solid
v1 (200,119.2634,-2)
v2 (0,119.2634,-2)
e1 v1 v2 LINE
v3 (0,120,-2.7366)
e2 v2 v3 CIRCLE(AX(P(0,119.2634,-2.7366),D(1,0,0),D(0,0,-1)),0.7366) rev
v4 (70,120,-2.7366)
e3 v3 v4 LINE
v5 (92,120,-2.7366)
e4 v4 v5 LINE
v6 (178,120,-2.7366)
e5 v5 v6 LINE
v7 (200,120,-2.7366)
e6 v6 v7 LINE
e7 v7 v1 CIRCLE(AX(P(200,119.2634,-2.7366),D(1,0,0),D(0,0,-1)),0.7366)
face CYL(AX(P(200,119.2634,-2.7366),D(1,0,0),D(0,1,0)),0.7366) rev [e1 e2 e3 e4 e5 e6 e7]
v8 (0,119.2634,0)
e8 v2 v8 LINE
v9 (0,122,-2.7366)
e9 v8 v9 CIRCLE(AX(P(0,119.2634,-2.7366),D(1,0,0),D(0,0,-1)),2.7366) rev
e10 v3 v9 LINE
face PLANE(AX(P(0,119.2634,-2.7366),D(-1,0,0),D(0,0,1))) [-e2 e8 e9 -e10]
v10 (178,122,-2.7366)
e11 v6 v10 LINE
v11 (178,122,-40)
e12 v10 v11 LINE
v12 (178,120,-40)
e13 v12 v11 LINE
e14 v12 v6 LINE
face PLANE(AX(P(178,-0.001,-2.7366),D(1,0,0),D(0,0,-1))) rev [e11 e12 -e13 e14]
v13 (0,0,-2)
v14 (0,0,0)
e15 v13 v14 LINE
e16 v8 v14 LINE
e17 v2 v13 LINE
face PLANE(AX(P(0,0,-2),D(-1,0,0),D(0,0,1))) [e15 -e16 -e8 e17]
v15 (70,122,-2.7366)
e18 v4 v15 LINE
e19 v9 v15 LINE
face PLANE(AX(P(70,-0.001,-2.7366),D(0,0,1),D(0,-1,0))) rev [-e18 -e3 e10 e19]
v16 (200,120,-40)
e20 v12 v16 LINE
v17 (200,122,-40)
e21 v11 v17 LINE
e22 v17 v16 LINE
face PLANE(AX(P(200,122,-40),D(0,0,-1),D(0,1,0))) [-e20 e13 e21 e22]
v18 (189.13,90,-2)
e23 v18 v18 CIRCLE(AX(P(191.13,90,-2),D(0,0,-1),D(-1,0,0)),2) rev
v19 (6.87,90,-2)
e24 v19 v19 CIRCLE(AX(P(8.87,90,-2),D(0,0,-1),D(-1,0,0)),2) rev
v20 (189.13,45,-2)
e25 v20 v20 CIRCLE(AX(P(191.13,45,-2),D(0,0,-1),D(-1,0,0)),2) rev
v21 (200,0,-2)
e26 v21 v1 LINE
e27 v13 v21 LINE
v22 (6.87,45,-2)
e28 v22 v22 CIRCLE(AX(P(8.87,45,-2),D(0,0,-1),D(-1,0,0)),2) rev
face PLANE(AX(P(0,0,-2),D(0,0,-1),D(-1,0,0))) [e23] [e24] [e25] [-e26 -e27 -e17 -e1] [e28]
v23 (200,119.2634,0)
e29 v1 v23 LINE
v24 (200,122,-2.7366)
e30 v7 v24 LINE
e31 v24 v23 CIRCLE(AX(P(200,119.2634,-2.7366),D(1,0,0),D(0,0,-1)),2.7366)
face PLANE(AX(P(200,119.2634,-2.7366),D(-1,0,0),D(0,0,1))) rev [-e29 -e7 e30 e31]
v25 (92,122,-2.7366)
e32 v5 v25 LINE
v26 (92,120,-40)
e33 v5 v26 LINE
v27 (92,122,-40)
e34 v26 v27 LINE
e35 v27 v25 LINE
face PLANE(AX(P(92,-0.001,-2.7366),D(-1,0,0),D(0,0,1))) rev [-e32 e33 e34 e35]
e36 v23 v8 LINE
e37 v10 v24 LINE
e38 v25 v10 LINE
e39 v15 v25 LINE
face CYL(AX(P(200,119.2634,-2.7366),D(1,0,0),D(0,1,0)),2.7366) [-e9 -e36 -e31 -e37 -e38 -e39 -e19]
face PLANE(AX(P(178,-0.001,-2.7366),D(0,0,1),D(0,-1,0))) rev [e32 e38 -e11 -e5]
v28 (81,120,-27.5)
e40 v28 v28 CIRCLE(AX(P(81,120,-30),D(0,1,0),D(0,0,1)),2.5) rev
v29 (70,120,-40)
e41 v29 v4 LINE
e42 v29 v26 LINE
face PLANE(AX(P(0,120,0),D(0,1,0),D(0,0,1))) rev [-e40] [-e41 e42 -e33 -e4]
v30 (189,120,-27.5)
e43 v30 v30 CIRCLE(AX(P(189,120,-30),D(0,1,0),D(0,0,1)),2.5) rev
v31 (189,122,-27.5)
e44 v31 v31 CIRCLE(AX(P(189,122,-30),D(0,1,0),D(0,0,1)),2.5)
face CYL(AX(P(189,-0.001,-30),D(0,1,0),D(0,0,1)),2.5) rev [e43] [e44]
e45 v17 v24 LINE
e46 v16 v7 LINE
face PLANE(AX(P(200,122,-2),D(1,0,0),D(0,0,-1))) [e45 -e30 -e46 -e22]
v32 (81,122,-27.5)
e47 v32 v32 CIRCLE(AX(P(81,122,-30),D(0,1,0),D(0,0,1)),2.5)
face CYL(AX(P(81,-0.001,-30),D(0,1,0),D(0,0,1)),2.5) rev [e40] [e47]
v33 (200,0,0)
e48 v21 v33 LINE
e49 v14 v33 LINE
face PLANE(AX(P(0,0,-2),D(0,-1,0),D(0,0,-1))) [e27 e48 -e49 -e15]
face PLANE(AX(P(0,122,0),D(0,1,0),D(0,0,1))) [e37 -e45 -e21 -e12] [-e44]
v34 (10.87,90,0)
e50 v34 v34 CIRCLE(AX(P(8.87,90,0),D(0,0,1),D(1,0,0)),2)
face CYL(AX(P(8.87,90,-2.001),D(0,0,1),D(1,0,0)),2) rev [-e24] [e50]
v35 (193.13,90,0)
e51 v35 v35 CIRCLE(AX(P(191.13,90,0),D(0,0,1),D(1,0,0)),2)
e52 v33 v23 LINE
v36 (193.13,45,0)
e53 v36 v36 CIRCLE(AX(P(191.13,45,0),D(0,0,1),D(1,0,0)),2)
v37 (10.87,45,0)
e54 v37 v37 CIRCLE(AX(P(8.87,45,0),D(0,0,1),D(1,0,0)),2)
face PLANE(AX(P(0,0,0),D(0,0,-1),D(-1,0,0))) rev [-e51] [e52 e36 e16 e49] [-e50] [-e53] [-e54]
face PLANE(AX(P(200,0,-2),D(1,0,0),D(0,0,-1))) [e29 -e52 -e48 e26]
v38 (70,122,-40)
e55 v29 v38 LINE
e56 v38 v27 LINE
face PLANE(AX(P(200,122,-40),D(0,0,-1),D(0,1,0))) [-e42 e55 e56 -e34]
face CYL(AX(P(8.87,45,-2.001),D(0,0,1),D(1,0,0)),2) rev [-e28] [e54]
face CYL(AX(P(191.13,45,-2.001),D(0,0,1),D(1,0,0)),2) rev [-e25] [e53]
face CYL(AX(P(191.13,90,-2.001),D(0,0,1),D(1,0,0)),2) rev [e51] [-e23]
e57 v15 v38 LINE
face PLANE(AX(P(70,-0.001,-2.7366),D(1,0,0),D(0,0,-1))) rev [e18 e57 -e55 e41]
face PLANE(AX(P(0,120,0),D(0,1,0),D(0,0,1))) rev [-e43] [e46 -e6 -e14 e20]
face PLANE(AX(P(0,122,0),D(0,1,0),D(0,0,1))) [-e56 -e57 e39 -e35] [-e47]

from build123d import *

# Parameters (mm, degrees)
SKETCH2_W                    = 200
SKETCH2_H                    = 120
BASE_FLANGE1_DEPTH           = 2
CUT_EXTRUDE1_REACH           = 235.247
SKETCH7_R                    = 2
EDGE_FLANGE1_STRIP_W         = 9.4732
EDGE_FLANGE1_STRIP_H         = 2
EDGE_FLANGE1_STRIP_CUT_DEPTH = 200
EDGE_FLANGE1_DEPTH           = 200
CUT_EXTRUDE2_REACH           = 239.664
SKETCH11_R                   = 2.5
SKETCH11_W                   = 86
SKETCH11_H                   = 37.2634
SKETCH11_W_2                 = 70


# Sheet-metal steps are written as plain solids
with BuildPart() as part:
    # Sketch2 → Base-Flange1 (new body)
    with BuildSketch(Plane.XY):
        with Locations((100, 60)):
            Rectangle(SKETCH2_W, SKETCH2_H)
    extrude(amount=-BASE_FLANGE1_DEPTH)

    # Sketch7 → Cut-Extrude1 (cut, up to next)
    with BuildSketch(Plane.XY, mode=Mode.PRIVATE) as cut_extrude1_sk1:
        with Locations((8.87, 90)):
            Circle(SKETCH7_R)
    cut_extrude1_tool1 = extrude(cut_extrude1_sk1.sketch, amount=-CUT_EXTRUDE1_REACH, mode=Mode.PRIVATE) & part.part
    # Sketch7 → Cut-Extrude1 (cut, up to next)
    with BuildSketch(Plane.XY, mode=Mode.PRIVATE) as cut_extrude1_sk2:
        with Locations((8.87, 45)):
            Circle(SKETCH7_R)
    cut_extrude1_tool2 = extrude(cut_extrude1_sk2.sketch, amount=-CUT_EXTRUDE1_REACH, mode=Mode.PRIVATE) & part.part
    # Sketch7 → Cut-Extrude1 (cut, up to next)
    with BuildSketch(Plane.XY, mode=Mode.PRIVATE) as cut_extrude1_sk3:
        with Locations((191.13, 45)):
            Circle(SKETCH7_R)
    cut_extrude1_tool3 = extrude(cut_extrude1_sk3.sketch, amount=-CUT_EXTRUDE1_REACH, mode=Mode.PRIVATE) & part.part
    # Sketch7 → Cut-Extrude1 (cut, up to next)
    with BuildSketch(Plane.XY, mode=Mode.PRIVATE) as cut_extrude1_sk4:
        with Locations((191.13, 90)):
            Circle(SKETCH7_R)
    cut_extrude1_tool4 = extrude(cut_extrude1_sk4.sketch, amount=-CUT_EXTRUDE1_REACH, mode=Mode.PRIVATE) & part.part
    add(cut_extrude1_tool1.solids().sort_by_distance((8.87, 90, 0))[0], mode=Mode.SUBTRACT)
    add(cut_extrude1_tool2.solids().sort_by_distance((8.87, 45, 0))[0], mode=Mode.SUBTRACT)
    add(cut_extrude1_tool3.solids().sort_by_distance((191.13, 45, 0))[0], mode=Mode.SUBTRACT)
    add(cut_extrude1_tool4.solids().sort_by_distance((191.13, 90, 0))[0], mode=Mode.SUBTRACT)

    # Edge-Flange1 strip (across the edge) → Edge-Flange1 strip cut (cut)
    with BuildSketch(Plane(origin=(0, 120, -2), x_dir=(0, -1, 0), z_dir=(1, 0, 0))):
        with Locations((-4, -1)):
            Rectangle(EDGE_FLANGE1_STRIP_W, EDGE_FLANGE1_STRIP_H)
    extrude(amount=EDGE_FLANGE1_STRIP_CUT_DEPTH, mode=Mode.SUBTRACT)

    # Edge-Flange1 section (across the edge) → Edge-Flange1 (add)
    with BuildSketch(Plane(origin=(0, 120, -2), x_dir=(0, -1, 0), z_dir=(1, 0, 0))):
        with BuildLine():
            Line((-2, 0.7366), (-2, 38))
            Line((-2, 38), (0, 38))
            Line((0, 38), (0, 0.7366))
            ThreePointArc((0, 0.7366), (0.215745145, 0.215745145), (0.7366, 0))
            Line((0.7366, 0), (0.7366, -2))
            ThreePointArc((0.7366, -2), (-1.198468417, -1.198468417), (-2, 0.7366))
        make_face()
    extrude(amount=EDGE_FLANGE1_DEPTH)

    # Sketch11 → Cut-Extrude2 (cut, up to next)
    with BuildSketch(Plane(origin=(0, 122, 0), x_dir=(1, 0, 0), z_dir=(0, 1, 0)), mode=Mode.PRIVATE) as cut_extrude2_sk1:
        with Locations(Location((189, 30, 0), (0, 0, 270))):
            Circle(SKETCH11_R)
    cut_extrude2_tool1 = extrude(cut_extrude2_sk1.sketch, amount=-CUT_EXTRUDE2_REACH, mode=Mode.PRIVATE) & part.part
    # Sketch11 → Cut-Extrude2 (cut, up to next)
    with BuildSketch(Plane(origin=(0, 122, 0), x_dir=(1, 0, 0), z_dir=(0, 1, 0)), mode=Mode.PRIVATE) as cut_extrude2_sk2:
        with Locations(Location((81, 30, 0), (0, 0, 270))):
            Circle(SKETCH11_R)
    cut_extrude2_tool2 = extrude(cut_extrude2_sk2.sketch, amount=-CUT_EXTRUDE2_REACH, mode=Mode.PRIVATE) & part.part
    # Sketch11 → Cut-Extrude2 (cut, up to next)
    with BuildSketch(Plane(origin=(0, 122, 0), x_dir=(1, 0, 0), z_dir=(0, 1, 0)), mode=Mode.PRIVATE) as cut_extrude2_sk3:
        with Locations((135, 21.3683)):
            Rectangle(SKETCH11_W, SKETCH11_H)
    cut_extrude2_tool3 = extrude(cut_extrude2_sk3.sketch, amount=-CUT_EXTRUDE2_REACH, mode=Mode.PRIVATE) & part.part
    # Sketch11 → Cut-Extrude2 (cut, up to next)
    with BuildSketch(Plane(origin=(0, 122, 0), x_dir=(1, 0, 0), z_dir=(0, 1, 0)), mode=Mode.PRIVATE) as cut_extrude2_sk4:
        with Locations((35, 21.3683)):
            Rectangle(SKETCH11_W_2, SKETCH11_H)
    cut_extrude2_tool4 = extrude(cut_extrude2_sk4.sketch, amount=-CUT_EXTRUDE2_REACH, mode=Mode.PRIVATE) & part.part
    add(cut_extrude2_tool1.solids().sort_by_distance((189, 122, -30))[0], mode=Mode.SUBTRACT)
    add(cut_extrude2_tool2.solids().sort_by_distance((81, 122, -30))[0], mode=Mode.SUBTRACT)
    add(cut_extrude2_tool3.solids().sort_by_distance((135, 122, -21.3683))[0], mode=Mode.SUBTRACT)
    add(cut_extrude2_tool4.solids().sort_by_distance((35, 122, -21.3683))[0], mode=Mode.SUBTRACT)


solid = part.part
